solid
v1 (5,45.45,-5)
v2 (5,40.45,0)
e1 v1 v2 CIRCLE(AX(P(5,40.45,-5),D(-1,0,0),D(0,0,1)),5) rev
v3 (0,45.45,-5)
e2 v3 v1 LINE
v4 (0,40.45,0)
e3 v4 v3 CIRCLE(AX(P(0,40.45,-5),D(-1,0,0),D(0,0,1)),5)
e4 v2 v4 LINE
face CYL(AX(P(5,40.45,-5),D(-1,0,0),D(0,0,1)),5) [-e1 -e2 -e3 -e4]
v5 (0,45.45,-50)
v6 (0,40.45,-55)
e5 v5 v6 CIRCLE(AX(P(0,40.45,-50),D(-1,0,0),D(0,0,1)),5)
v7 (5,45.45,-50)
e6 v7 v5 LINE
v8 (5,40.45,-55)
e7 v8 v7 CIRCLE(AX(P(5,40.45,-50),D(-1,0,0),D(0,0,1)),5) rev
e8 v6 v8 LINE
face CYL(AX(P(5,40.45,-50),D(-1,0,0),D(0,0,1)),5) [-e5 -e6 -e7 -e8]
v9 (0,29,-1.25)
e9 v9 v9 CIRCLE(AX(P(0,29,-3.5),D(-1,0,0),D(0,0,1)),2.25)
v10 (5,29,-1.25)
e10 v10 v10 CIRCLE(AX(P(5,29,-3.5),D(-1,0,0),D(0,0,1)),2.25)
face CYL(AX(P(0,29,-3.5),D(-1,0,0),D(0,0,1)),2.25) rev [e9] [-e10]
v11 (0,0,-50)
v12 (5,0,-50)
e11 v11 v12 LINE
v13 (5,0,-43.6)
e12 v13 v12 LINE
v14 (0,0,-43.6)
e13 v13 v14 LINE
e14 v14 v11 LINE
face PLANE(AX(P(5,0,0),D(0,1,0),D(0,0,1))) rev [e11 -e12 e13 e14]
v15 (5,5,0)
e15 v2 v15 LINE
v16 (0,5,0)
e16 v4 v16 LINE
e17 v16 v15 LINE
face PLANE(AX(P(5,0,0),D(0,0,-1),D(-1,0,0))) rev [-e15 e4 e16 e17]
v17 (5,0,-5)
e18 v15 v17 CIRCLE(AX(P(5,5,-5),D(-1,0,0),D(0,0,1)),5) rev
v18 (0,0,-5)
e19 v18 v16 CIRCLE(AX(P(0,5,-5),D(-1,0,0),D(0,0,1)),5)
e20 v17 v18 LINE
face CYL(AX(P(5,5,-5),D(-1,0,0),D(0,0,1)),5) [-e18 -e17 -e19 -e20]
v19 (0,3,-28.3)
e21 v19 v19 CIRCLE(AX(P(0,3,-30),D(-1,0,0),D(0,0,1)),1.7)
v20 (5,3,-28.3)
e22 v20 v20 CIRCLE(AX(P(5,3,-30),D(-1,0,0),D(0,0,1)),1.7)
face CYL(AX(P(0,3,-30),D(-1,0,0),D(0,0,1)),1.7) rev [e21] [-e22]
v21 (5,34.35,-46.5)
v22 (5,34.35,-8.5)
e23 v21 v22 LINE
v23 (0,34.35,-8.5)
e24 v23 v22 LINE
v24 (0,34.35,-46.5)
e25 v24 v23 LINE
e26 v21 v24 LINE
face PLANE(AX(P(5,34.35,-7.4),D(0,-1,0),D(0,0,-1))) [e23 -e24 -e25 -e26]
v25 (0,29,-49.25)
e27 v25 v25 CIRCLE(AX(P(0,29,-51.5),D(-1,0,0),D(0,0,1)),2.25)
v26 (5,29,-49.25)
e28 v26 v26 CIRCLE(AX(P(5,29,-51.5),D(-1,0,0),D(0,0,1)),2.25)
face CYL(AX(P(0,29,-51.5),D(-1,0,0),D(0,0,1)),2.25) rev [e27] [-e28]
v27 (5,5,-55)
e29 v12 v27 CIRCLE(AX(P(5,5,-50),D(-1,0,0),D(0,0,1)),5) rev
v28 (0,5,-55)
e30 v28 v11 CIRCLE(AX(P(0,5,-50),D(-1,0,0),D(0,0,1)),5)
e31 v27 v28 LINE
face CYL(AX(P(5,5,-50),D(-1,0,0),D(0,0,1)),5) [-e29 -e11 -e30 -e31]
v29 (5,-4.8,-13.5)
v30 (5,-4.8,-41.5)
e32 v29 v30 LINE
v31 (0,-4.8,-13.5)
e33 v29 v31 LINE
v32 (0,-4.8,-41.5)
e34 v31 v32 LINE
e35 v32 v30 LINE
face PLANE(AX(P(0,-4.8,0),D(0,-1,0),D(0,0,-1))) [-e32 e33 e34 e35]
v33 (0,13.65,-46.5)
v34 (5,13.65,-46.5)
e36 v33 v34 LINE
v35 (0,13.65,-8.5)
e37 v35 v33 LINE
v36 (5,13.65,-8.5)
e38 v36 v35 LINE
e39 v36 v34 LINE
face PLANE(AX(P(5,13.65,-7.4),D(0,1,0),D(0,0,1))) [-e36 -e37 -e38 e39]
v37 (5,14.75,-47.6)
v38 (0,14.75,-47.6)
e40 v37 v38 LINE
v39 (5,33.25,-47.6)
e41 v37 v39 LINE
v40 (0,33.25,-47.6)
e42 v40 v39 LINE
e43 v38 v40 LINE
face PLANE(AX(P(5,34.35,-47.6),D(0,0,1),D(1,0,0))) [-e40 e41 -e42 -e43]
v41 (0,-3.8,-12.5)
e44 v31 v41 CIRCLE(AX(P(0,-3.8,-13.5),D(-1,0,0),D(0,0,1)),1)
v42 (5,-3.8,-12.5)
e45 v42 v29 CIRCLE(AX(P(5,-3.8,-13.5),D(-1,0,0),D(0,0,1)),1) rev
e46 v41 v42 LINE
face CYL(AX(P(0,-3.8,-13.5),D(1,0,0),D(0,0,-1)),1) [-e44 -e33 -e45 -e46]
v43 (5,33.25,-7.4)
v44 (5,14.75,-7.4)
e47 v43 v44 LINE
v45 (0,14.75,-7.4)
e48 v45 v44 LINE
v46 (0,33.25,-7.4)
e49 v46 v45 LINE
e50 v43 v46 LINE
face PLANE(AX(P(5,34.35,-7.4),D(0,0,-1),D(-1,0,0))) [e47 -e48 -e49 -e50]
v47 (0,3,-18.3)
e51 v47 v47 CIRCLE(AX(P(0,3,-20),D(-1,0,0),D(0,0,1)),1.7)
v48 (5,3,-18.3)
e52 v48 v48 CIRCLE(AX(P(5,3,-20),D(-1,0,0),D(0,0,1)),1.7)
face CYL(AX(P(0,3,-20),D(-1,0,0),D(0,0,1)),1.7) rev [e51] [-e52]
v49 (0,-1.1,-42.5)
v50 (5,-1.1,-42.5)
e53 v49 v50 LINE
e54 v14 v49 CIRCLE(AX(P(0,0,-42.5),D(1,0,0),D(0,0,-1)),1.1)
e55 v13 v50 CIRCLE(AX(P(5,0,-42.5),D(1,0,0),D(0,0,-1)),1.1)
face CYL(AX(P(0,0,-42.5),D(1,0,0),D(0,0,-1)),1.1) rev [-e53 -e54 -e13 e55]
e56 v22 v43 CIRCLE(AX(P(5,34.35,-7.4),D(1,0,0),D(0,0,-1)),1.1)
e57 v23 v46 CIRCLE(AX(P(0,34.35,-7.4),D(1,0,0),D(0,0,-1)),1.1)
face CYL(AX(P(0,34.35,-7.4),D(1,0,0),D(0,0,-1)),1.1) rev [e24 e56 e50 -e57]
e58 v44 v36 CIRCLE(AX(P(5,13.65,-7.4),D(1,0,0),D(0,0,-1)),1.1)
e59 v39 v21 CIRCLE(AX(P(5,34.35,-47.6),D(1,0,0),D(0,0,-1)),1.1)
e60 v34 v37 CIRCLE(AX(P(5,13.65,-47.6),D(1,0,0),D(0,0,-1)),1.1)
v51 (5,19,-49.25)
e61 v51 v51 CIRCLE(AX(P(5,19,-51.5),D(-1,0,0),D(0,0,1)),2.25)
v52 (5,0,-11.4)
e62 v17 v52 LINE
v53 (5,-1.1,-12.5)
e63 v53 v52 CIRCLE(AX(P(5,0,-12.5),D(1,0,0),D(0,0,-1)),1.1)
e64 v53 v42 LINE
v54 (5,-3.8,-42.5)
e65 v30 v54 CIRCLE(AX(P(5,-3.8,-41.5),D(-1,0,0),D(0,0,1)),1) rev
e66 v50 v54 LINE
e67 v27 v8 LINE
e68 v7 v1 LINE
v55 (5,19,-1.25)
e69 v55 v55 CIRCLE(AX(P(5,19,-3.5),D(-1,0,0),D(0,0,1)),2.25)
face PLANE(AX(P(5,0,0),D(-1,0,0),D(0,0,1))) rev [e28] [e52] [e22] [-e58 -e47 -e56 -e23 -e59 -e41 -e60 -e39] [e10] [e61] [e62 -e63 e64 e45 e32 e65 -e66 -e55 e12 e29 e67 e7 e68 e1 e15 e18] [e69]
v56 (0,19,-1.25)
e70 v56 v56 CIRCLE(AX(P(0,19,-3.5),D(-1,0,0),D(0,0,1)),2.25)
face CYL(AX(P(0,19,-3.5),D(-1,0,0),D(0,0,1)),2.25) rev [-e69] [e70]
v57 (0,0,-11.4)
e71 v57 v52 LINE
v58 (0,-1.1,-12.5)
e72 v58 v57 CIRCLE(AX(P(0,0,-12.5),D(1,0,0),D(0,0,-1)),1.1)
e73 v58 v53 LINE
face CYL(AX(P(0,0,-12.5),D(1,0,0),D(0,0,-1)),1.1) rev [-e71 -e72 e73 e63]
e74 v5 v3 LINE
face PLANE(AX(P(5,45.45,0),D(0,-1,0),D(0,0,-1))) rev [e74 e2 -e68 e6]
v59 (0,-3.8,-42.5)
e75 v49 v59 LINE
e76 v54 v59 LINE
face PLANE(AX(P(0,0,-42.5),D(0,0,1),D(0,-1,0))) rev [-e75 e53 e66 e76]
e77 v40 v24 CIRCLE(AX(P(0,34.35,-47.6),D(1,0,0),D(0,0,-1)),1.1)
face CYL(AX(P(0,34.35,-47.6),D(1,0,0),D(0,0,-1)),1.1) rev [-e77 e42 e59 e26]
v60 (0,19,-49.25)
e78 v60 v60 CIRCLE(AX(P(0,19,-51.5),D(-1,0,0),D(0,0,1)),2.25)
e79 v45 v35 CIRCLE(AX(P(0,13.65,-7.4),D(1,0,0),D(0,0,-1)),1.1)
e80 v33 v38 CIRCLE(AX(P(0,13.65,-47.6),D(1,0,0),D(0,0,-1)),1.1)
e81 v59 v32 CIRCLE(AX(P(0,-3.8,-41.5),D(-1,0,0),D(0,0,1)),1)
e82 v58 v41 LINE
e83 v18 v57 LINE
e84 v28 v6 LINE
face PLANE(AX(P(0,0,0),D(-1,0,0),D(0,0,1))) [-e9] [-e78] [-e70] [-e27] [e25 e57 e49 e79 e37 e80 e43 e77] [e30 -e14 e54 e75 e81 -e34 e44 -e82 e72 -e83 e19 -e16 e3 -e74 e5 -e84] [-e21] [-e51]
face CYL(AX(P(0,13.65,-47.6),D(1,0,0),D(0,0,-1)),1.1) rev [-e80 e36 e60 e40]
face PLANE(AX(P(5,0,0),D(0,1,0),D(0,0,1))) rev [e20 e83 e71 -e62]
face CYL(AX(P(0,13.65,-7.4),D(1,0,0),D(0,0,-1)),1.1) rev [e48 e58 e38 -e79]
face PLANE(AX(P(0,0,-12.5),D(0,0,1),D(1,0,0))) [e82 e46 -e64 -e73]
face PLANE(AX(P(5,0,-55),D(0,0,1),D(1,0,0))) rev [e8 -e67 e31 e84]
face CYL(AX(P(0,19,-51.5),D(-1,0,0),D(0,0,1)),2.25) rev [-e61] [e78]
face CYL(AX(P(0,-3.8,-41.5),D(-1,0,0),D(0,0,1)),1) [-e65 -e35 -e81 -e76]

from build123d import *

# Parameters (mm, degrees)
SKETCH_1_W                   = 55
SKETCH_1_H                   = 45.45
SKETCH_1_W_2                 = 40.2
SKETCH_1_H_2                 = 20.7
EXTRUDE_1_DEPTH              = 5
SKETCH_2_W                   = 30
SKETCH_2_H                   = 4.8
EXTRUDE_2_DEPTH              = 5
FILLET_1_R                   = 5
SKETCH_3_R                   = 1.1
CUT_EXTRUDE_1_DEPTH          = 5
FILLET_2_R                   = 1
HOLE_WIZARD_M3_1_D           = 3.4
M4_CLEARANCE_HOLE1_OUTLINE_R = 2.25
M4_CLEARANCE_HOLE1_DEPTH     = 5


# Read off the part's stored shape, not the designer's step: M4 Clearance Hole1
with BuildPart() as part:
    # 草图1 → 凸台-拉伸1 (new body)
    with BuildSketch(Plane(origin=(0, 0, 0), x_dir=(0, 0, -1), z_dir=(1, 0, 0))):
        with Locations((27.5, 22.725)):
            Rectangle(SKETCH_1_W, SKETCH_1_H)
        with Locations((27.5, 24)):
            Rectangle(SKETCH_1_W_2, SKETCH_1_H_2, mode=Mode.SUBTRACT)
    extrude(amount=EXTRUDE_1_DEPTH)

    # 草图2 → 凸台-拉伸2 (add)
    with BuildSketch(Plane(origin=(5, 0, 0), x_dir=(0, 0, -1), z_dir=(1, 0, 0))):
        with Locations((27.5, -2.4)):
            Rectangle(SKETCH_2_W, SKETCH_2_H)
    extrude(amount=-EXTRUDE_2_DEPTH)

    # 圆角1
    fillet_1_edges = [part.edges().sort_by_distance(p)[0] for p in [
        (2.5, 45.45, 0),
        (2.5, 45.45, -55),
        (2.5, 0, -55),
        (2.5, 0, 0),
    ]]
    fillet(fillet_1_edges, radius=FILLET_1_R)

    # 草图3 → 切除-拉伸1 (cut)
    with BuildSketch(Plane(origin=(5, 0, 0), x_dir=(0, 0, -1), z_dir=(1, 0, 0))):
        with Locations((12.5, 0)):
            Circle(SKETCH_3_R)
        with Locations((42.5, 0)):
            Circle(SKETCH_3_R)
        with Locations((7.4, 13.65)):
            Circle(SKETCH_3_R)
        with Locations((7.4, 34.35)):
            Circle(SKETCH_3_R)
        with Locations((47.6, 34.35)):
            Circle(SKETCH_3_R)
        with Locations((47.6, 13.65)):
            Circle(SKETCH_3_R)
    extrude(amount=-CUT_EXTRUDE_1_DEPTH, mode=Mode.SUBTRACT)

    # 圆角2
    fillet_2_edges = [part.edges().sort_by_distance(p)[0] for p in [
        (2.5, -4.8, -42.5),
        (2.5, -4.8, -12.5),
    ]]
    fillet(fillet_2_edges, radius=FILLET_2_R)

    # M3 间隙孔1 (through all)
    with Locations(Plane.ZY):
        with Locations((-20, 3), (-30, 3)):
            Hole(HOLE_WIZARD_M3_1_D / 2)

    # M4 Clearance Hole1 outline → M4 Clearance Hole1 (cut)
    with BuildSketch(Plane.YZ):
        with Locations((29, -3.5)):
            Circle(M4_CLEARANCE_HOLE1_OUTLINE_R)
        with Locations((19, -51.5)):
            Circle(M4_CLEARANCE_HOLE1_OUTLINE_R)
        with Locations((19, -3.5)):
            Circle(M4_CLEARANCE_HOLE1_OUTLINE_R)
        with Locations((29, -51.5)):
            Circle(M4_CLEARANCE_HOLE1_OUTLINE_R)
    extrude(amount=M4_CLEARANCE_HOLE1_DEPTH, mode=Mode.SUBTRACT)


solid = part.part
